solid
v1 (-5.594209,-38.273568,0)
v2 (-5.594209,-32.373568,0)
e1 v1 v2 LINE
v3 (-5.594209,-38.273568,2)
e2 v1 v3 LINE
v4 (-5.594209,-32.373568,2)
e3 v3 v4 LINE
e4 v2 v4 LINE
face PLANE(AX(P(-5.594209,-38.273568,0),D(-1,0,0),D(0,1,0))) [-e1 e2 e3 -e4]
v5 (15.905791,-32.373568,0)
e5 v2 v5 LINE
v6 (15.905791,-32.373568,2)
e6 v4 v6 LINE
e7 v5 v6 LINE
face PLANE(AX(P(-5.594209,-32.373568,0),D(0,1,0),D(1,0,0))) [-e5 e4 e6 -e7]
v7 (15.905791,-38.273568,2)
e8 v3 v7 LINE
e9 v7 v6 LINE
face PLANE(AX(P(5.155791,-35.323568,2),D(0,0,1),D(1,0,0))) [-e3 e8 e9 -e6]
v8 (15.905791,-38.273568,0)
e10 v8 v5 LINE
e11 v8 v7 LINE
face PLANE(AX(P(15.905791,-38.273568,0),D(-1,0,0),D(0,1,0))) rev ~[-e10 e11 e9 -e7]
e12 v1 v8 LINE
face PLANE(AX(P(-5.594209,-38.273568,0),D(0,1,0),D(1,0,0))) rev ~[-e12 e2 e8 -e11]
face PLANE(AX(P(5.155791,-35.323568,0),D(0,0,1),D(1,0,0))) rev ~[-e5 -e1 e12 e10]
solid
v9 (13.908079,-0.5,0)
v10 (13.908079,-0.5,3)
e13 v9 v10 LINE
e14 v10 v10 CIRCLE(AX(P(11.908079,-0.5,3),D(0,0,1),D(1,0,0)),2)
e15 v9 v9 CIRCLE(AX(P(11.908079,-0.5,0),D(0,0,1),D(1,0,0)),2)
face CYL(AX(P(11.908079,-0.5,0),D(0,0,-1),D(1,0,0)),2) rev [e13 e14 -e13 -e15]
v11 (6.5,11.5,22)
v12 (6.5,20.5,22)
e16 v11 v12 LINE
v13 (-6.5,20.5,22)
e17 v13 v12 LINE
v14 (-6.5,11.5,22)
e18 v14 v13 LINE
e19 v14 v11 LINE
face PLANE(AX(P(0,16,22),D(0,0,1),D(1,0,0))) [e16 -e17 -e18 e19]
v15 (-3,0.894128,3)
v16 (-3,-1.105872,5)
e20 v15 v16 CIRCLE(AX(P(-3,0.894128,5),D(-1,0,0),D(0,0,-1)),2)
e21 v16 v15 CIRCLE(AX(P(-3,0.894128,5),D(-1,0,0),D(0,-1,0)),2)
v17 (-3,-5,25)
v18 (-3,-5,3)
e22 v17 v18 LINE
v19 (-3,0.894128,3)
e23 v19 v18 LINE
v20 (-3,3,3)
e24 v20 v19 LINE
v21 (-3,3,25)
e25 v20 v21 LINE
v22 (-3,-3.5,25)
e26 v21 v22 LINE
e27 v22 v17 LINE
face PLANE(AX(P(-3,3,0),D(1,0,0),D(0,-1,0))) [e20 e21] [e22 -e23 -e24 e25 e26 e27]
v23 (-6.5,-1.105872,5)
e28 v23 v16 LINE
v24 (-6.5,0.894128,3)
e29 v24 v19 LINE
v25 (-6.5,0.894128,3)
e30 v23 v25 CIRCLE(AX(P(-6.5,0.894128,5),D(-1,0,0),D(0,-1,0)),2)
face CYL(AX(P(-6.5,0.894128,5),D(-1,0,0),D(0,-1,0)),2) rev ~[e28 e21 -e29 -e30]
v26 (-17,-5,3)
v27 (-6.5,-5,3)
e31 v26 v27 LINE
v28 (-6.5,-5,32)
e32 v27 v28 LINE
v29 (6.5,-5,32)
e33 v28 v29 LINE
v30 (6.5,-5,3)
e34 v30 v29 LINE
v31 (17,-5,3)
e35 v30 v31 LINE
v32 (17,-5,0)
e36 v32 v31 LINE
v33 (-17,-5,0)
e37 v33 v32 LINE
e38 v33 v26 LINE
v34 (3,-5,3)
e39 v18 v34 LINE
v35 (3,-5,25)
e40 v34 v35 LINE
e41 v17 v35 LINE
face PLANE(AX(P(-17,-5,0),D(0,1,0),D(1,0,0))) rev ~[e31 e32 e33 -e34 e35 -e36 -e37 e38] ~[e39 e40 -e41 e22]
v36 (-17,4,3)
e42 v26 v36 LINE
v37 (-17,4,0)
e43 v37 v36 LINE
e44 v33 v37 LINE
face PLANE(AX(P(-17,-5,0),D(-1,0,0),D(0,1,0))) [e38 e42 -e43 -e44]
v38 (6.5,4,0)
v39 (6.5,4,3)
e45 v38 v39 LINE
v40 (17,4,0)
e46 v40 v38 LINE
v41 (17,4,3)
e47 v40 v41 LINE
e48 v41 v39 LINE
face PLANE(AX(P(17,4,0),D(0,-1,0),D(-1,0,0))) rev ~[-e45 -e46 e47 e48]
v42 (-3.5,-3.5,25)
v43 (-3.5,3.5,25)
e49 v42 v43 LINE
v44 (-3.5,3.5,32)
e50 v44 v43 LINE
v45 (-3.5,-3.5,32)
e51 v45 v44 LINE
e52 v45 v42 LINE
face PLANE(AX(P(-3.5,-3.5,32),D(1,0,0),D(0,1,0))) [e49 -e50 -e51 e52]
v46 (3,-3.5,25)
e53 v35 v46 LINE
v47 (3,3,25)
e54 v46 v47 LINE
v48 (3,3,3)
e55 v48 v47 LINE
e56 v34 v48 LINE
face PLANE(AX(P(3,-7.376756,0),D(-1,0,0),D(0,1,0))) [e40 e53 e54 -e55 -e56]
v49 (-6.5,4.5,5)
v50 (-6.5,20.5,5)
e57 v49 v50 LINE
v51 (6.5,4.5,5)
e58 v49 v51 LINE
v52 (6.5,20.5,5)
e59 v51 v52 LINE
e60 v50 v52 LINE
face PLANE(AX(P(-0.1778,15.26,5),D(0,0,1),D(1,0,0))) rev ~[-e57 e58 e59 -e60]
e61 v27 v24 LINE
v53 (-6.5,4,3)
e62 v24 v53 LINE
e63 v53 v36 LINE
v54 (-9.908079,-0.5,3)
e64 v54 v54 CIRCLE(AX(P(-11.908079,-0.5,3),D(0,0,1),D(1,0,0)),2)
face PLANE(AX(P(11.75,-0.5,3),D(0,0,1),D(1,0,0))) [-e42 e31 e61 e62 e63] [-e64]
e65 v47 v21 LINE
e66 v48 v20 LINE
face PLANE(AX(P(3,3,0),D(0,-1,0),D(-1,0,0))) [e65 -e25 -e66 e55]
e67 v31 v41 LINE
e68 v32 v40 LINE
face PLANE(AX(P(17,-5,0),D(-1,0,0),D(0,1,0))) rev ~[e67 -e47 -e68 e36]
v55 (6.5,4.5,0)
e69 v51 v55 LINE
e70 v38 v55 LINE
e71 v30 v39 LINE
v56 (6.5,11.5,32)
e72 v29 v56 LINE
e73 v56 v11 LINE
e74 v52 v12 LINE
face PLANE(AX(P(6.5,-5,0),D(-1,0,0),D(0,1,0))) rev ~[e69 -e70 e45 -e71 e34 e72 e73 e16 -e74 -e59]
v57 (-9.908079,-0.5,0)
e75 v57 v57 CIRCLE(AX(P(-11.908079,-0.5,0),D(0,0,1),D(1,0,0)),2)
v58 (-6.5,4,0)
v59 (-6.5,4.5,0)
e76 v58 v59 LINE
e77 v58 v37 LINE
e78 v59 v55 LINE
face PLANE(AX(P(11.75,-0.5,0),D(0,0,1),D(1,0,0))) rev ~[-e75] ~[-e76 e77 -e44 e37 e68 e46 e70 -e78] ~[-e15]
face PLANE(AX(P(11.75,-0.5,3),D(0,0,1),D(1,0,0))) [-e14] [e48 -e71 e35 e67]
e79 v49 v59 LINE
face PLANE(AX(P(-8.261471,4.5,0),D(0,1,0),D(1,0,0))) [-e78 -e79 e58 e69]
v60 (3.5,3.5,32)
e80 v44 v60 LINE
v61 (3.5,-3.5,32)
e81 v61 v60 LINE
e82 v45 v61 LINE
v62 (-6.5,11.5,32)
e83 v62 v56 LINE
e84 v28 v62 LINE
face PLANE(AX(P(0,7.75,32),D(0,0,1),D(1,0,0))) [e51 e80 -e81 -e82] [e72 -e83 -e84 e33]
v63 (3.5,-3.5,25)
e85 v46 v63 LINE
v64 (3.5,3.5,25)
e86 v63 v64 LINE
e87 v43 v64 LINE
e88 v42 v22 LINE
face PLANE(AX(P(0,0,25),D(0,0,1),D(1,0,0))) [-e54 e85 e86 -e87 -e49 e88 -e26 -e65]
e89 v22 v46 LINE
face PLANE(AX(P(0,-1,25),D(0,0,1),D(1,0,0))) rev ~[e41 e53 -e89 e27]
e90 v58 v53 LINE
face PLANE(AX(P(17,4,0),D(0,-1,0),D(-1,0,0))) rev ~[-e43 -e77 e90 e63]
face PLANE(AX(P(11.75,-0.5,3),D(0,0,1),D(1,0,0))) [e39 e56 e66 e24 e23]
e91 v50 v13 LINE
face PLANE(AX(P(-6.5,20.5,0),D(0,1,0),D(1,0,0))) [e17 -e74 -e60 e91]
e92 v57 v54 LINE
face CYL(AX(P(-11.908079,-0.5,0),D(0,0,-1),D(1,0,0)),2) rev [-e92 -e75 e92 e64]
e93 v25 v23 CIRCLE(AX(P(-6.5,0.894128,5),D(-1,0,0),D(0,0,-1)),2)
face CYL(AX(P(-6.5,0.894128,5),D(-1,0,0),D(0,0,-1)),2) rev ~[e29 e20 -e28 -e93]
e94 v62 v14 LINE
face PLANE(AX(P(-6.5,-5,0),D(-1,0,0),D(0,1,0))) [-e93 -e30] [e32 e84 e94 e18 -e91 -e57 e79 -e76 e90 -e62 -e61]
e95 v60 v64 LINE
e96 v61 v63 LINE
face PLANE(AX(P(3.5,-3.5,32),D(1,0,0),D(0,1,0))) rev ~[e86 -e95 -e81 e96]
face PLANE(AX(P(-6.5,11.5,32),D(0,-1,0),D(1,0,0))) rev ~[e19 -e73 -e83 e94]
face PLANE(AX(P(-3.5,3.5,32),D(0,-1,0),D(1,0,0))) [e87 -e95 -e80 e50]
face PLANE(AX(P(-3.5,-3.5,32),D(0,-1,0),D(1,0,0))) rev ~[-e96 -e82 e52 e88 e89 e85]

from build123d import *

# Parameters (mm, degrees)
F0_W      = 13
F0_H      = 25.5
F1_DEPTH  = 32
F2_W      = 7
F2_H      = 7
F3_DEPTH  = 7
F4_W      = 6
F4_H      = 2.3767555878
F5_DEPTH  = 25
F2_W_2    = 13
F2_H_2    = 9
F6_DEPTH  = 10
F7_W      = 10.5
F7_H      = 9
F7_R      = 2
F7_W_2    = 13
F8_DEPTH  = 3
F7_H_2    = 16
F9_DEPTH  = 5
F11_DEPTH = 7
F12_W     = 21.5
F12_H     = 5.9
F13_DEPTH = 2


# Not quite as in the source:
# - a feature names something its author has since deleted; it is built from what else it names


with BuildPart() as f1:
    # F0 (on Top) → F1 (new body)
    with BuildSketch(Plane.XY):
        with Locations((0, 7.75)):
            Rectangle(F0_W, F0_H)
    extrude(amount=F1_DEPTH)

    # F2 (on face) → F3 (cut)
    with BuildSketch(Plane.XY.offset(32)):
        Rectangle(F2_W, F2_H)
    extrude(amount=-F3_DEPTH, mode=Mode.SUBTRACT)

    # F4 (on face) → F5 (cut)
    with BuildSketch(Plane.XY):
        Polygon((3, 3), (-3, 3), (-3, -3), (-3, -5), (3, -5), (3, -3), align=None)
        with Locations((0, -6.1883777939)):
            Rectangle(F4_W, F4_H)
    extrude(amount=F5_DEPTH, mode=Mode.SUBTRACT)

    # F2 (on face) → F6 (cut)
    with BuildSketch(Plane.XY.offset(32)):
        with Locations((0, 16)):
            Rectangle(F2_W_2, F2_H_2)
    extrude(amount=-F6_DEPTH, mode=Mode.SUBTRACT)

    # F7 (on face) → F8 (join)
    with BuildSketch(Plane.XY):
        with Locations((11.75, -0.5)):
            Rectangle(F7_W, F7_H)
        with Locations((11.9080794975, -0.5)):
            Circle(F7_R, mode=Mode.SUBTRACT)
        with Locations((-11.75, -0.5)):
            Rectangle(F7_W, F7_H)
        with Locations((-11.9080794975, -0.5)):
            Circle(F7_R, mode=Mode.SUBTRACT)
        with Locations((0, -0.5)):
            Rectangle(F7_W_2, F7_H)
    extrude(amount=F8_DEPTH)

    # F7 (on face) → F9 (cut)
    with BuildSketch(Plane.XY):
        Polygon((-8.2614710554, 4.5), (-6.5, 4.5), (-6.5, 20.5), (6.5, 20.5), (6.5, 4.5), (7.7385289446, 4.5), (7.7385289446, 22.5), (-8.2614710554, 22.5), align=None)
        with Locations((0, 12.5)):
            Rectangle(F7_W_2, F7_H_2)
    extrude(amount=F9_DEPTH, mode=Mode.SUBTRACT)

    # F10 (on face) → F11 (cut)
    with BuildSketch(Plane(origin=(-6.5, 0, 0), x_dir=(0, -1, 0), z_dir=(-1, 0, 0))):
        with BuildLine():
            ThreePointArc((-0.8941277629, 3), (0.5200857995, 3.5857864376), (1.1058722371, 5))
            ThreePointArc((1.1058722371, 5), (-2.3083413252, 6.4142135624), (-0.8941277629, 3))
        make_face()
    extrude(amount=-F11_DEPTH, mode=Mode.SUBTRACT)


with BuildPart() as f13:
    # F12 (on Top) → F13 (new body)
    with BuildSketch(Plane.XY):
        with Locations((5.1557905699, -35.3235676074)):
            Rectangle(F12_W, F12_H)
    extrude(amount=F13_DEPTH)


solid = Compound([f1.part, f13.part])
